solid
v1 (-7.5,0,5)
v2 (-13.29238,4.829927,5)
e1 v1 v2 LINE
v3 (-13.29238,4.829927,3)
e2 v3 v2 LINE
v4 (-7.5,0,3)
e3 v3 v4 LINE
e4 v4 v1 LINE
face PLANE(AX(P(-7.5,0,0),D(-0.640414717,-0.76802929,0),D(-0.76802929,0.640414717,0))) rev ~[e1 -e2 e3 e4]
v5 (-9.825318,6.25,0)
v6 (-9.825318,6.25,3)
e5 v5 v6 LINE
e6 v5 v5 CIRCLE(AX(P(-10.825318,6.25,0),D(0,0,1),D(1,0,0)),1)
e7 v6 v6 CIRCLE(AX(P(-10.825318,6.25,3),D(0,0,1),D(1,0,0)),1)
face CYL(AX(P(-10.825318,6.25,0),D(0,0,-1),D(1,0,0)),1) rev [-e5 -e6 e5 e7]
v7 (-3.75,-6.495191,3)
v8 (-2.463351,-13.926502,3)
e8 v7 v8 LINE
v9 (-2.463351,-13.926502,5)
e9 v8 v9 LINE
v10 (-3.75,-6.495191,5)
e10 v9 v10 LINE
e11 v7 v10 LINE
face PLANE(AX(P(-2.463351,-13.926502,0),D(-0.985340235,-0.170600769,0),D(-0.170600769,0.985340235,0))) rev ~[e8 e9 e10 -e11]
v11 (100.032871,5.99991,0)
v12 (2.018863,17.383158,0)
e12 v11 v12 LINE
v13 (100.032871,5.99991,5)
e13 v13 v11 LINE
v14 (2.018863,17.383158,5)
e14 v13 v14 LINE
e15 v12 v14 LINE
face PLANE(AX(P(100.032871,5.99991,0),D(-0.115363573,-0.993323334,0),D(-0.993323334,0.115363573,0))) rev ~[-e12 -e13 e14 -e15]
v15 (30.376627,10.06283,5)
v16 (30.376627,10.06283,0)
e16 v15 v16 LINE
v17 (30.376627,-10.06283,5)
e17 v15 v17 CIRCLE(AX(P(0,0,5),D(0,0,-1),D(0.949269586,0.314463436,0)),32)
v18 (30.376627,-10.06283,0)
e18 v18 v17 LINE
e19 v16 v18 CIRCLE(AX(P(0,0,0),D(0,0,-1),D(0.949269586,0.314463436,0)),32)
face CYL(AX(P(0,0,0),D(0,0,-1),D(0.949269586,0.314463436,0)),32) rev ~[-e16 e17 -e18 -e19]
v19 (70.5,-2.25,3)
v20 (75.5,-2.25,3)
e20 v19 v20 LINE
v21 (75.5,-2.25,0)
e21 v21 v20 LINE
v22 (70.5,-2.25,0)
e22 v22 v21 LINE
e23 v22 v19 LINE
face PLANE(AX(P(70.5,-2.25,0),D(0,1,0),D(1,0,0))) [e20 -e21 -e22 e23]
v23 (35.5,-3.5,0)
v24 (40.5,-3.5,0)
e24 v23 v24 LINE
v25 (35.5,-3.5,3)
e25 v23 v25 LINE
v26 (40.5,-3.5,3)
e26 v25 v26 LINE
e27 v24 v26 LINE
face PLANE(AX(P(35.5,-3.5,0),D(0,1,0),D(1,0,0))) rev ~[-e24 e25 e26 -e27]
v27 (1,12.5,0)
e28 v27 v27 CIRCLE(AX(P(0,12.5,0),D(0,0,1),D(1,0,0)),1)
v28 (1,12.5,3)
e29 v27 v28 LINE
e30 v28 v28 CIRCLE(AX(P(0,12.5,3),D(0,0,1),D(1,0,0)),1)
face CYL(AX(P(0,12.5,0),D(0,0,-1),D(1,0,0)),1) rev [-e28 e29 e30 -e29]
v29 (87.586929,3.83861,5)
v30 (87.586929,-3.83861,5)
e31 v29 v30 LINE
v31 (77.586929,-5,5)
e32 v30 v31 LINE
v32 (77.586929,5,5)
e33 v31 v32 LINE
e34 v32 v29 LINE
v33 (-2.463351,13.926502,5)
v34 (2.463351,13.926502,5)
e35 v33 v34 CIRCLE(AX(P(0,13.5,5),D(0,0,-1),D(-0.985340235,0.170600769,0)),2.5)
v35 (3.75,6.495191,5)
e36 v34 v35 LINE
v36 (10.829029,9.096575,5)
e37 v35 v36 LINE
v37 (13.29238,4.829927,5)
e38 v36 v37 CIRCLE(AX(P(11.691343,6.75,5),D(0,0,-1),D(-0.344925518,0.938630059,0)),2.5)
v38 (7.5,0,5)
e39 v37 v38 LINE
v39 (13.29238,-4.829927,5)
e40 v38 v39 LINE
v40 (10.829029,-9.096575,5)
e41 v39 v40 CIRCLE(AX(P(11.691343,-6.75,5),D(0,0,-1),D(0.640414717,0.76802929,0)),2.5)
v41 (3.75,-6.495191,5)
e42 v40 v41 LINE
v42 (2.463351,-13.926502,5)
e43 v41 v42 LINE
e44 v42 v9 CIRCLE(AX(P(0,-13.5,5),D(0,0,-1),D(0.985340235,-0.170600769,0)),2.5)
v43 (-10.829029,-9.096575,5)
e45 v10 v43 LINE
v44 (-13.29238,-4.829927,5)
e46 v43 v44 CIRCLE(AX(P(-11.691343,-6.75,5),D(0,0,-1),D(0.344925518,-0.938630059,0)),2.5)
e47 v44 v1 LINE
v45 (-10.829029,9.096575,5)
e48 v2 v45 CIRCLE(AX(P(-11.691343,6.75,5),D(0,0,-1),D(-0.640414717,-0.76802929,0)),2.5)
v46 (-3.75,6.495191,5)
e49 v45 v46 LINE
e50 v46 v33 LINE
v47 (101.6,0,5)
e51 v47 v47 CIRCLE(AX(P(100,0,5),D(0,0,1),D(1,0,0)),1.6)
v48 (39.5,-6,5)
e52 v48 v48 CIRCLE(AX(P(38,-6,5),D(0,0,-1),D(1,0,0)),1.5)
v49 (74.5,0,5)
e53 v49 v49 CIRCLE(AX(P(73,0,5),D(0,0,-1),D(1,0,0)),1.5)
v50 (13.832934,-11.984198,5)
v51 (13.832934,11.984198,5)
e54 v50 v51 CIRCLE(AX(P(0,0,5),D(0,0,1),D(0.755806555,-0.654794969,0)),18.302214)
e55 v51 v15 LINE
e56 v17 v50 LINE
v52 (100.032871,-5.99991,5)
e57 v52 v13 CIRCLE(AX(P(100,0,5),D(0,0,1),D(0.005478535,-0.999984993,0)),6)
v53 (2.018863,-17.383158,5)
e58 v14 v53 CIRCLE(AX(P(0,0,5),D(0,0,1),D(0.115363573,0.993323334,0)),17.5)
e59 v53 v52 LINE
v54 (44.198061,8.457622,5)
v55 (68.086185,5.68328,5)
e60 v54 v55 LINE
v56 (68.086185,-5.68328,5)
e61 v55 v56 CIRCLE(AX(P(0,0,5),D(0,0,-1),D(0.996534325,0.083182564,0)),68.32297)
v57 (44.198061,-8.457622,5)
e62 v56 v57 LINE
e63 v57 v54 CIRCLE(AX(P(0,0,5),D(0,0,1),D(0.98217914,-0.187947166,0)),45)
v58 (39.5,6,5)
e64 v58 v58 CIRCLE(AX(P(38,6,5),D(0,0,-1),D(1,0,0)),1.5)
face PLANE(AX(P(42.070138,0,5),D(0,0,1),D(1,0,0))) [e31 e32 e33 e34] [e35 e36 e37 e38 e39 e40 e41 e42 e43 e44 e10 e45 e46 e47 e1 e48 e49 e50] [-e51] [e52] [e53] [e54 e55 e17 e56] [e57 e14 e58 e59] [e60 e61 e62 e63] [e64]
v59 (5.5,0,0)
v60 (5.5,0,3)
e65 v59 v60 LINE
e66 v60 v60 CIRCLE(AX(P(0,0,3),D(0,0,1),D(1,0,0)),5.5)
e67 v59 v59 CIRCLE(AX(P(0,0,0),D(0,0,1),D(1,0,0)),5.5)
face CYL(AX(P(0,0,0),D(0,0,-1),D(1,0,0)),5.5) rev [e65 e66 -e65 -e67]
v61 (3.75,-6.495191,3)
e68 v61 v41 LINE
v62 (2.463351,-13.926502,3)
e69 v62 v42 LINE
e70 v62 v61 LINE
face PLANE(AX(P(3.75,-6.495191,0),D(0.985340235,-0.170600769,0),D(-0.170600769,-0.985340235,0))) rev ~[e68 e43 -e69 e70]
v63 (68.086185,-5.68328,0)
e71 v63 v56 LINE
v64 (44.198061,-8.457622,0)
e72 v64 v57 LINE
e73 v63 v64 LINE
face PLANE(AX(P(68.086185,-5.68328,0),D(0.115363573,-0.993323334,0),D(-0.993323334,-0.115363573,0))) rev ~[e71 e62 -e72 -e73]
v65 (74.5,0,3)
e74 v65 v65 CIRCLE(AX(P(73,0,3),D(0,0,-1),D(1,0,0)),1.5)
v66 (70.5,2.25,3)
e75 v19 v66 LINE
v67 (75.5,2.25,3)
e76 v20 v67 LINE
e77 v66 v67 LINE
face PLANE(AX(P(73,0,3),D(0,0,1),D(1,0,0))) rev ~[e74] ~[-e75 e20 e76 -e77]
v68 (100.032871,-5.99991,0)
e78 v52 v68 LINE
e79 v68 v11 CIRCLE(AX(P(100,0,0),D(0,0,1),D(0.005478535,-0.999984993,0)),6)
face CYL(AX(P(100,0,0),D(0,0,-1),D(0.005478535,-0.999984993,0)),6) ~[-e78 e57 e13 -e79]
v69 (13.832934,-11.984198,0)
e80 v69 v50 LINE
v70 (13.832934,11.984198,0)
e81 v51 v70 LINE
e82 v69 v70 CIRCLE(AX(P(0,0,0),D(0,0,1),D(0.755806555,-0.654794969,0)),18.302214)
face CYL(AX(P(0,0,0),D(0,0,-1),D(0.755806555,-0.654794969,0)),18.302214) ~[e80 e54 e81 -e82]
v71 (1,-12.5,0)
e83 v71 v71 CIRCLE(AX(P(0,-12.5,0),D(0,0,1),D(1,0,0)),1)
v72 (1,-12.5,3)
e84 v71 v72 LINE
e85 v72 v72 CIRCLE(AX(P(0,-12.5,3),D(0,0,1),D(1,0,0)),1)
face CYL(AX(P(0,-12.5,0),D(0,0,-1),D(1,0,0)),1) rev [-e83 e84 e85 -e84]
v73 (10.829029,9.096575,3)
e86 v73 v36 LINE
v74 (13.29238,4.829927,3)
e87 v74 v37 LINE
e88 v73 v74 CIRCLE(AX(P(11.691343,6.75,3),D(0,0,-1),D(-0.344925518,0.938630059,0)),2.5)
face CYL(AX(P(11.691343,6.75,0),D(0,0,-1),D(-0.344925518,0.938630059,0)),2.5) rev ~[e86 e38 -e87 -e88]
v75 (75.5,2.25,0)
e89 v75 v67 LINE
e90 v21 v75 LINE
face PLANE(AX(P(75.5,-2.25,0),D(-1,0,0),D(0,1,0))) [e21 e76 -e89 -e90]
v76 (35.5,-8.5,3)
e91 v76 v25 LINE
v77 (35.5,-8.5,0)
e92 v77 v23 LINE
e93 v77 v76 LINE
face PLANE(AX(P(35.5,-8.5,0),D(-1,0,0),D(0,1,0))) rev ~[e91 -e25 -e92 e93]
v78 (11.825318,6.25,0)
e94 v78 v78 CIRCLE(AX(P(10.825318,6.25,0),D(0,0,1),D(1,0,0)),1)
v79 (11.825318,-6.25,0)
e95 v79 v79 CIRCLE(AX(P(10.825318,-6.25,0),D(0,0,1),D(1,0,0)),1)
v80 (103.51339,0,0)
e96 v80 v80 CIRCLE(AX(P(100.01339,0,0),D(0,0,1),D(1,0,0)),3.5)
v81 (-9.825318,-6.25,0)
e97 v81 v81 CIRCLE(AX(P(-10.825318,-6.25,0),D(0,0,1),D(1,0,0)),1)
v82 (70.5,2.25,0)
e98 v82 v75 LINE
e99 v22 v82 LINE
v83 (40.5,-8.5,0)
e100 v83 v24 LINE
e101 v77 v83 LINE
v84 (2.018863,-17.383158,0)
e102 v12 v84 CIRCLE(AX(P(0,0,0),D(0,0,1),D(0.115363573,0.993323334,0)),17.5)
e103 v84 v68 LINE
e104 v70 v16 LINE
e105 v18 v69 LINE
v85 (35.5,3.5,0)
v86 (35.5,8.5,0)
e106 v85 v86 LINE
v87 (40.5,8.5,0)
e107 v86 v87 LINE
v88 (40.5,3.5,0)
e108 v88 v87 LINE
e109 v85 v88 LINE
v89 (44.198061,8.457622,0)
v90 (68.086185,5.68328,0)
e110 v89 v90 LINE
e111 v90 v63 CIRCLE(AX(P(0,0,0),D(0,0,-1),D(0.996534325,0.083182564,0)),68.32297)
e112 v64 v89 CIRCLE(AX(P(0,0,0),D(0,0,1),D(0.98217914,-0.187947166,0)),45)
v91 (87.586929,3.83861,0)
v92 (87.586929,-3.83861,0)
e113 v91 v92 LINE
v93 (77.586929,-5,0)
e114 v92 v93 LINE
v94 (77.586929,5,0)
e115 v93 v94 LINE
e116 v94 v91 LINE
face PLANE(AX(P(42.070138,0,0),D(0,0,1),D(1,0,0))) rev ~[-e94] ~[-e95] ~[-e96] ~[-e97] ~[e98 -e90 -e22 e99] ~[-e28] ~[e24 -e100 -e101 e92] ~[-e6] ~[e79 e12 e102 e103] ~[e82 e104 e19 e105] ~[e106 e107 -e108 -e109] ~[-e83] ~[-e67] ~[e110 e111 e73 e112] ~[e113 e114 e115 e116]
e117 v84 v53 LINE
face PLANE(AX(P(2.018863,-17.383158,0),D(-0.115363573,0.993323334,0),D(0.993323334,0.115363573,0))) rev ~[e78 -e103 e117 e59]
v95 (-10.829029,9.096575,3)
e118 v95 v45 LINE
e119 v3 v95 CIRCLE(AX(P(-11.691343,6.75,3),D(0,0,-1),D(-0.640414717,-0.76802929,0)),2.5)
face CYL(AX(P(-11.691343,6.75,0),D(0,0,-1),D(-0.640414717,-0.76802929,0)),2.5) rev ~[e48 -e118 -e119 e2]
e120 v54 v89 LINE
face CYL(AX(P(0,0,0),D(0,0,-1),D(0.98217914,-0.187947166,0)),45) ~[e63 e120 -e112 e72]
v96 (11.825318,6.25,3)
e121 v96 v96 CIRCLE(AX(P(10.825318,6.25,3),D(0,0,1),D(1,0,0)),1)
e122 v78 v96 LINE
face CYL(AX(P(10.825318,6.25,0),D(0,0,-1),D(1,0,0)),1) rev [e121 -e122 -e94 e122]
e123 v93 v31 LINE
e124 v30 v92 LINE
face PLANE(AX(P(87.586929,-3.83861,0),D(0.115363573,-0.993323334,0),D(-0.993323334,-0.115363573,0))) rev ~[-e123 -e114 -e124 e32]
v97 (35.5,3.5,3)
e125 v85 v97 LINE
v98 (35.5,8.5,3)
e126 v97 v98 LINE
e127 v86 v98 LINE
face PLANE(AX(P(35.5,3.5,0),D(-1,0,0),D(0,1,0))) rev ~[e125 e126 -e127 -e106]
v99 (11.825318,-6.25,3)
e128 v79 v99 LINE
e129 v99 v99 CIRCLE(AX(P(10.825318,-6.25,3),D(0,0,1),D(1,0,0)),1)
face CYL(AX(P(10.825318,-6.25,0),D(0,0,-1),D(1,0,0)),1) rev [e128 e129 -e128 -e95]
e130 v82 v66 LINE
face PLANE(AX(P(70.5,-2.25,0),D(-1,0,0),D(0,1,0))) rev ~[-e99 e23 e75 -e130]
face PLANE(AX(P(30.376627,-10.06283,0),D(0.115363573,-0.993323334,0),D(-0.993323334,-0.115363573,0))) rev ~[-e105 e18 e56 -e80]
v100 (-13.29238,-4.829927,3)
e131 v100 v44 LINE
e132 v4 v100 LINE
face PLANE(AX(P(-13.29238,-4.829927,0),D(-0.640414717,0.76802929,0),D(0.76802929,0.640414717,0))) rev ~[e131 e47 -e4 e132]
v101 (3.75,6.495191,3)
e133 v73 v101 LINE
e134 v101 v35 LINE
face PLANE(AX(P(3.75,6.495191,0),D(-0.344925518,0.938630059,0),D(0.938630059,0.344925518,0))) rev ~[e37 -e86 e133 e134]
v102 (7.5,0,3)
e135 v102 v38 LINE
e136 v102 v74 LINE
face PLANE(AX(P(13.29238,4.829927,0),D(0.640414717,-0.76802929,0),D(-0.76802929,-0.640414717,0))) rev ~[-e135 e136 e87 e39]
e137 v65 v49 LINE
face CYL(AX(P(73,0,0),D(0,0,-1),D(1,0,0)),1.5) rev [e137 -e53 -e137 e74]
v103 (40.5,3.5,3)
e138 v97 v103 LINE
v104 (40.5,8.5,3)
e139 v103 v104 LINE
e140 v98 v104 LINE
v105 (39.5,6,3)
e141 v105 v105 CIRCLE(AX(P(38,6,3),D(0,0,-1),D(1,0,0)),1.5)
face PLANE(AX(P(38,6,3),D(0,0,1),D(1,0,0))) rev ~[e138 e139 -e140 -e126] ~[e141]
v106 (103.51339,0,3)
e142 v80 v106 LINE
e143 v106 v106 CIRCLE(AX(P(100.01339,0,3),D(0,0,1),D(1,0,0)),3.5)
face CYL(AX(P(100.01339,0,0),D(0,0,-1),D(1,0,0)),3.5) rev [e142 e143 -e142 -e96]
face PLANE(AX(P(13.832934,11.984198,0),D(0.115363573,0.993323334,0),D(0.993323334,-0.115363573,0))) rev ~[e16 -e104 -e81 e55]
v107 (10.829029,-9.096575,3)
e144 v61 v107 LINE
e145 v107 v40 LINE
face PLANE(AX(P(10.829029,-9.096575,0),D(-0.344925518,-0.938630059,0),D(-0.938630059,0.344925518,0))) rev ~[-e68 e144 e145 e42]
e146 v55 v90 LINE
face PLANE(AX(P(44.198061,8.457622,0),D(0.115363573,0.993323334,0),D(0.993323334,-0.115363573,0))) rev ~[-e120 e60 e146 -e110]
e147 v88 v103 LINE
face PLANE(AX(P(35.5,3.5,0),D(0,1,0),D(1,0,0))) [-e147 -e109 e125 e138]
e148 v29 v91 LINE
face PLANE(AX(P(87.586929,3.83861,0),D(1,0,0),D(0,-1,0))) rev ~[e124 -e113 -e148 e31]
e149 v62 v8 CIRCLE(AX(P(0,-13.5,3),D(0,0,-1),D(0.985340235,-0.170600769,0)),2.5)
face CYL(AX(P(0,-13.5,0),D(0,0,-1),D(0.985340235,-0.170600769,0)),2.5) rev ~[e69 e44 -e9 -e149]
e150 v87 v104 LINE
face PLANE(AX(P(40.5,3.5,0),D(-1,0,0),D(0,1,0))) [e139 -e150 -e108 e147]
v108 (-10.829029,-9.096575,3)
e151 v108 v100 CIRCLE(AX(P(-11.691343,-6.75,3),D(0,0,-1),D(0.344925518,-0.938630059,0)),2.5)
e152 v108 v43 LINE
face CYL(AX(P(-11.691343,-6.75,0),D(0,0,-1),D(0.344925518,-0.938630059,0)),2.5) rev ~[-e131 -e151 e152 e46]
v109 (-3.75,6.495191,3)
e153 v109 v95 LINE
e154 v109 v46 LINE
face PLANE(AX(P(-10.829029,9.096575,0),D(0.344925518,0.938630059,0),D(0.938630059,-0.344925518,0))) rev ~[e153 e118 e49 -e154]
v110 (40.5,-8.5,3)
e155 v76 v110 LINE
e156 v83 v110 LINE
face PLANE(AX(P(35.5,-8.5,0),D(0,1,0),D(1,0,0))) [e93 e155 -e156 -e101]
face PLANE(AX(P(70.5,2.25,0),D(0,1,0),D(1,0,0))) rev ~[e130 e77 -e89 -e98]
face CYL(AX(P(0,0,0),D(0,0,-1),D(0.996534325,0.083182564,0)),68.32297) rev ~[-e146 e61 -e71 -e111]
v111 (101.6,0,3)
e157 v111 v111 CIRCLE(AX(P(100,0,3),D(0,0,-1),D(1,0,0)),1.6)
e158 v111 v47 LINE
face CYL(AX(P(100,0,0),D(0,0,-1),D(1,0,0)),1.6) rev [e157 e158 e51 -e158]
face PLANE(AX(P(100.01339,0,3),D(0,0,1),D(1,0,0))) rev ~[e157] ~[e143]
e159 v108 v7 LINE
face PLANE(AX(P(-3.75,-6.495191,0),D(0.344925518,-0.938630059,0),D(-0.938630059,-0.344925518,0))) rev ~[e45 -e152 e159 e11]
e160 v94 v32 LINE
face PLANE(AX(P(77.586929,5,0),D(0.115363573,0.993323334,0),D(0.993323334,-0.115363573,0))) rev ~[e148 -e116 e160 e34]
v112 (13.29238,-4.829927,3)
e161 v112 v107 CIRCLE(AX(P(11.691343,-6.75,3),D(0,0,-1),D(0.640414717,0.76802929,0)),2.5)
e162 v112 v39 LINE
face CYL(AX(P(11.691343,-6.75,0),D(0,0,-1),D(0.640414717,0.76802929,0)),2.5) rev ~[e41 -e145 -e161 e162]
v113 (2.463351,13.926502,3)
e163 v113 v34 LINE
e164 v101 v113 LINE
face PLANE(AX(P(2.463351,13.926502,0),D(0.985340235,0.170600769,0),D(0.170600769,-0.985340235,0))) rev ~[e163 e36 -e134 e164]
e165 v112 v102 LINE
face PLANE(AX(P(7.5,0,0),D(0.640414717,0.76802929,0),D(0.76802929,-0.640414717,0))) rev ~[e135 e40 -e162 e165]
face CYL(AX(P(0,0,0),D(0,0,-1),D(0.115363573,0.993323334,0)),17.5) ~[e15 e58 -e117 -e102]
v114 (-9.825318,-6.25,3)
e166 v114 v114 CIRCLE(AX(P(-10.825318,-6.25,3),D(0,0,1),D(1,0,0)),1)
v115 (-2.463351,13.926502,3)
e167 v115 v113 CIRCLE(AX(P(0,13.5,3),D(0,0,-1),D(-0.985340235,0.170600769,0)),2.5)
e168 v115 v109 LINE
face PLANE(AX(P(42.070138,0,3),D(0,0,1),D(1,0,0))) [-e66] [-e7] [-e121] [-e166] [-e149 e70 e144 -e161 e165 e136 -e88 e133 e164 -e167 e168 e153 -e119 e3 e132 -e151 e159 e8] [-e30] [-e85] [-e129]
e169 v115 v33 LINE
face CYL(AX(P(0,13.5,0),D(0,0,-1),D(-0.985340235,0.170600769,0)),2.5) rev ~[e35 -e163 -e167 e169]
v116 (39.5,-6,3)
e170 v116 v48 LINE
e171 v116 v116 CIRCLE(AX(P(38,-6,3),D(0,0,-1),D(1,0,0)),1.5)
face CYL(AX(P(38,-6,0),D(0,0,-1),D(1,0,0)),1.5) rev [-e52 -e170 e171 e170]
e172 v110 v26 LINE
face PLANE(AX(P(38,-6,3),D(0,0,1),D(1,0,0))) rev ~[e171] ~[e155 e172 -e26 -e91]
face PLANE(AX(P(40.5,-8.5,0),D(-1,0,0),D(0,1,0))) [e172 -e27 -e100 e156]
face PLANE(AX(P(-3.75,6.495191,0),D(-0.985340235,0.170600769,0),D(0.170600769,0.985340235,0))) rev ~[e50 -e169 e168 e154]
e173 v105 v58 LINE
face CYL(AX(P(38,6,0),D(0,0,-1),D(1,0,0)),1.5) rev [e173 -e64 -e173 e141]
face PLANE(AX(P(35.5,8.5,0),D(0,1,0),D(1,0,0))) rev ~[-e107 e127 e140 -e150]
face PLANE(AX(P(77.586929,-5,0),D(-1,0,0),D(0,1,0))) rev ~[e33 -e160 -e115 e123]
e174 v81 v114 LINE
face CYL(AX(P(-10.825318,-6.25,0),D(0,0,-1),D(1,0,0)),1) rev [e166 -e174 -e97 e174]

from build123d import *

# Parameters (mm, degrees)
F0_R     = 1.6
F0_R_2   = 5.5
F1_DEPTH = 3
F2_DEPTH = 5
F3_R     = 1
F3_W     = 5
F3_H     = 5
F3_H_2   = 4.5
F3_R_2   = 3.5
F4_DEPTH = 3
F5_R     = 1.5
F6_DEPTH = 25
F7_DEPTH = 25


# Not quite as in the source:
# - a feature names something its author has since deleted; it is built from what else it names


with BuildPart() as f1:
    # F0 (on Top) → F1 (new body)
    with BuildSketch(Plane.XY):
        with BuildLine():
            Line((100.0328712093, 5.9999099563), (2.0188625271, 17.3831583464))
            ThreePointArc((2.0188625271, 17.3831583464), (-17.5, 0), (2.0188625271, -17.3831583464))
            Line((2.0188625271, -17.3831583464), (100.0328712093, -5.9999099563))
            ThreePointArc((100.0328712093, -5.9999099563), (106, 0), (100.0328712093, 5.9999099563))
        make_face()
        with BuildLine():
            ThreePointArc((-2.4633505863, 13.9265019214), (0, 16), (2.4633505863, 13.9265019214))
            Line((2.4633505863, 13.9265019214), (3.75, 6.4951905284))
            Line((3.75, 6.4951905284), (10.8290291566, 9.0965751469))
            ThreePointArc((10.8290291566, 9.0965751469), (13.8564064606, 8), (13.2923797429, 4.8299267745))
            Line((13.2923797429, 4.8299267745), (7.5, 0))
            Line((7.5, 0), (13.2923797429, -4.8299267745))
            ThreePointArc((13.2923797429, -4.8299267745), (13.8564064606, -8), (10.8290291566, -9.0965751469))
            Line((10.8290291566, -9.0965751469), (3.75, -6.4951905284))
            Line((3.75, -6.4951905284), (2.4633505863, -13.9265019214))
            ThreePointArc((2.4633505863, -13.9265019214), (0, -16), (-2.4633505863, -13.9265019214))
            Line((-2.4633505863, -13.9265019214), (-3.75, -6.4951905284))
            Line((-3.75, -6.4951905284), (-10.8290291566, -9.0965751469))
            ThreePointArc((-10.8290291566, -9.0965751469), (-13.8564064606, -8), (-13.2923797429, -4.8299267745))
            Line((-13.2923797429, -4.8299267745), (-7.5, 0))
            Line((-7.5, 0), (-13.2923797429, 4.8299267745))
            ThreePointArc((-13.2923797429, 4.8299267745), (-13.8564064606, 8), (-10.8290291566, 9.0965751469))
            Line((-10.8290291566, 9.0965751469), (-3.75, 6.4951905284))
            Line((-3.75, 6.4951905284), (-2.4633505863, 13.9265019214))
        make_face(mode=Mode.SUBTRACT)
        with BuildLine():
            Line((30.3766267594, -10.0628299558), (13.8329335508, -11.9841978461))
            ThreePointArc((13.8329335508, -11.9841978461), (18.3022143096, 0), (13.8329335508, 11.9841978461))
            Line((13.8329335508, 11.9841978461), (30.3766267594, 10.0628299558))
            ThreePointArc((30.3766267594, 10.0628299558), (32, 0), (30.3766267594, -10.0628299558))
        make_face(mode=Mode.SUBTRACT)
        with BuildLine():
            Line((68.0861847768, -5.6832798143), (44.198061298, -8.4576224495))
            ThreePointArc((44.198061298, -8.4576224495), (45, 0), (44.198061298, 8.4576224495))
            Line((44.198061298, 8.4576224495), (68.0861847768, 5.6832798143))
            ThreePointArc((68.0861847768, 5.6832798143), (68.3229699802, 0), (68.0861847768, -5.6832798143))
        make_face(mode=Mode.SUBTRACT)
        Polygon((77.5869291791, -5), (77.5869291791, 5), (87.5869291791, 3.8386100576), (87.5869291791, -3.8386100576), align=None, mode=Mode.SUBTRACT)
        with Locations((100, 0)):
            Circle(F0_R, mode=Mode.SUBTRACT)
        with BuildLine():
            Line((3.75, 6.4951905284), (2.4633505863, 13.9265019214))
            ThreePointArc((2.4633505863, 13.9265019214), (0, 16), (-2.4633505863, 13.9265019214))
            Line((-2.4633505863, 13.9265019214), (-3.75, 6.4951905284))
            Line((-3.75, 6.4951905284), (-10.8290291566, 9.0965751469))
            ThreePointArc((-10.8290291566, 9.0965751469), (-13.8564064606, 8), (-13.2923797429, 4.8299267745))
            Line((-13.2923797429, 4.8299267745), (-7.5, 0))
            Line((-7.5, 0), (-13.2923797429, -4.8299267745))
            ThreePointArc((-13.2923797429, -4.8299267745), (-13.8564064606, -8), (-10.8290291566, -9.0965751469))
            Line((-10.8290291566, -9.0965751469), (-3.75, -6.4951905284))
            Line((-3.75, -6.4951905284), (-2.4633505863, -13.9265019214))
            ThreePointArc((-2.4633505863, -13.9265019214), (0, -16), (2.4633505863, -13.9265019214))
            Line((2.4633505863, -13.9265019214), (3.75, -6.4951905284))
            Line((3.75, -6.4951905284), (10.8290291566, -9.0965751469))
            ThreePointArc((10.8290291566, -9.0965751469), (13.8564064606, -8), (13.2923797429, -4.8299267745))
            Line((13.2923797429, -4.8299267745), (7.5, 0))
            Line((7.5, 0), (13.2923797429, 4.8299267745))
            ThreePointArc((13.2923797429, 4.8299267745), (13.8564064606, 8), (10.8290291566, 9.0965751469))
            Line((10.8290291566, 9.0965751469), (3.75, 6.4951905284))
        make_face()
        Circle(F0_R_2, mode=Mode.SUBTRACT)
    extrude(amount=F1_DEPTH)

    # F0 (on Top) → F2 (join)
    with BuildSketch(Plane.XY):
        with BuildLine():
            Line((100.0328712093, 5.9999099563), (2.0188625271, 17.3831583464))
            ThreePointArc((2.0188625271, 17.3831583464), (-17.5, 0), (2.0188625271, -17.3831583464))
            Line((2.0188625271, -17.3831583464), (100.0328712093, -5.9999099563))
            ThreePointArc((100.0328712093, -5.9999099563), (106, 0), (100.0328712093, 5.9999099563))
        make_face()
        with BuildLine():
            ThreePointArc((-2.4633505863, 13.9265019214), (0, 16), (2.4633505863, 13.9265019214))
            Line((2.4633505863, 13.9265019214), (3.75, 6.4951905284))
            Line((3.75, 6.4951905284), (10.8290291566, 9.0965751469))
            ThreePointArc((10.8290291566, 9.0965751469), (13.8564064606, 8), (13.2923797429, 4.8299267745))
            Line((13.2923797429, 4.8299267745), (7.5, 0))
            Line((7.5, 0), (13.2923797429, -4.8299267745))
            ThreePointArc((13.2923797429, -4.8299267745), (13.8564064606, -8), (10.8290291566, -9.0965751469))
            Line((10.8290291566, -9.0965751469), (3.75, -6.4951905284))
            Line((3.75, -6.4951905284), (2.4633505863, -13.9265019214))
            ThreePointArc((2.4633505863, -13.9265019214), (0, -16), (-2.4633505863, -13.9265019214))
            Line((-2.4633505863, -13.9265019214), (-3.75, -6.4951905284))
            Line((-3.75, -6.4951905284), (-10.8290291566, -9.0965751469))
            ThreePointArc((-10.8290291566, -9.0965751469), (-13.8564064606, -8), (-13.2923797429, -4.8299267745))
            Line((-13.2923797429, -4.8299267745), (-7.5, 0))
            Line((-7.5, 0), (-13.2923797429, 4.8299267745))
            ThreePointArc((-13.2923797429, 4.8299267745), (-13.8564064606, 8), (-10.8290291566, 9.0965751469))
            Line((-10.8290291566, 9.0965751469), (-3.75, 6.4951905284))
            Line((-3.75, 6.4951905284), (-2.4633505863, 13.9265019214))
        make_face(mode=Mode.SUBTRACT)
        with BuildLine():
            Line((30.3766267594, -10.0628299558), (13.8329335508, -11.9841978461))
            ThreePointArc((13.8329335508, -11.9841978461), (18.3022143096, 0), (13.8329335508, 11.9841978461))
            Line((13.8329335508, 11.9841978461), (30.3766267594, 10.0628299558))
            ThreePointArc((30.3766267594, 10.0628299558), (32, 0), (30.3766267594, -10.0628299558))
        make_face(mode=Mode.SUBTRACT)
        with BuildLine():
            Line((68.0861847768, -5.6832798143), (44.198061298, -8.4576224495))
            ThreePointArc((44.198061298, -8.4576224495), (45, 0), (44.198061298, 8.4576224495))
            Line((44.198061298, 8.4576224495), (68.0861847768, 5.6832798143))
            ThreePointArc((68.0861847768, 5.6832798143), (68.3229699802, 0), (68.0861847768, -5.6832798143))
        make_face(mode=Mode.SUBTRACT)
        Polygon((77.5869291791, -5), (77.5869291791, 5), (87.5869291791, 3.8386100576), (87.5869291791, -3.8386100576), align=None, mode=Mode.SUBTRACT)
        with Locations((100, 0)):
            Circle(F0_R, mode=Mode.SUBTRACT)
    extrude(amount=F2_DEPTH)

    # F3 (on face) → F4 (cut)
    with BuildSketch(Plane.XY):
        with Locations((0, -12.5)):
            Circle(F3_R)
        with Locations((10.8253175473, -6.25)):
            Circle(F3_R)
        with Locations((10.8253175473, 6.25)):
            Circle(F3_R)
        with Locations((0, 12.5)):
            Circle(F3_R)
        with Locations((-10.8253175473, 6.25)):
            Circle(F3_R)
        with Locations((-10.8253175473, -6.25)):
            Circle(F3_R)
        with Locations((38, 6)):
            Rectangle(F3_W, F3_H)
        with Locations((73, 0)):
            Rectangle(F3_W, F3_H_2)
        with Locations((38, -6)):
            Rectangle(F3_W, F3_H)
        with Locations((100.0133901834, 0)):
            Circle(F3_R_2)
    extrude(amount=F4_DEPTH, mode=Mode.SUBTRACT)

    # F5 (on face) → F6 (cut)
    with BuildSketch(Plane.XY):
        with Locations((38, -6)):
            Circle(F5_R)
        with Locations((73, 0)):
            Circle(F5_R)
        with Locations((38, 6)):
            Circle(F5_R)
    extrude(amount=F6_DEPTH, mode=Mode.SUBTRACT)

    # F3 (on face) → F7 (cut)
    with BuildSketch(Plane.XY):
        with Locations((0, -12.5)):
            Circle(F3_R)
        with Locations((10.8253175473, -6.25)):
            Circle(F3_R)
        with Locations((10.8253175473, 6.25)):
            Circle(F3_R)
        with Locations((0, 12.5)):
            Circle(F3_R)
        with Locations((-10.8253175473, 6.25)):
            Circle(F3_R)
        with Locations((-10.8253175473, -6.25)):
            Circle(F3_R)
        with Locations((73, 0)):
            Rectangle(F3_W, F3_H_2)
    extrude(amount=-F7_DEPTH, mode=Mode.SUBTRACT)


solid = f1.part
